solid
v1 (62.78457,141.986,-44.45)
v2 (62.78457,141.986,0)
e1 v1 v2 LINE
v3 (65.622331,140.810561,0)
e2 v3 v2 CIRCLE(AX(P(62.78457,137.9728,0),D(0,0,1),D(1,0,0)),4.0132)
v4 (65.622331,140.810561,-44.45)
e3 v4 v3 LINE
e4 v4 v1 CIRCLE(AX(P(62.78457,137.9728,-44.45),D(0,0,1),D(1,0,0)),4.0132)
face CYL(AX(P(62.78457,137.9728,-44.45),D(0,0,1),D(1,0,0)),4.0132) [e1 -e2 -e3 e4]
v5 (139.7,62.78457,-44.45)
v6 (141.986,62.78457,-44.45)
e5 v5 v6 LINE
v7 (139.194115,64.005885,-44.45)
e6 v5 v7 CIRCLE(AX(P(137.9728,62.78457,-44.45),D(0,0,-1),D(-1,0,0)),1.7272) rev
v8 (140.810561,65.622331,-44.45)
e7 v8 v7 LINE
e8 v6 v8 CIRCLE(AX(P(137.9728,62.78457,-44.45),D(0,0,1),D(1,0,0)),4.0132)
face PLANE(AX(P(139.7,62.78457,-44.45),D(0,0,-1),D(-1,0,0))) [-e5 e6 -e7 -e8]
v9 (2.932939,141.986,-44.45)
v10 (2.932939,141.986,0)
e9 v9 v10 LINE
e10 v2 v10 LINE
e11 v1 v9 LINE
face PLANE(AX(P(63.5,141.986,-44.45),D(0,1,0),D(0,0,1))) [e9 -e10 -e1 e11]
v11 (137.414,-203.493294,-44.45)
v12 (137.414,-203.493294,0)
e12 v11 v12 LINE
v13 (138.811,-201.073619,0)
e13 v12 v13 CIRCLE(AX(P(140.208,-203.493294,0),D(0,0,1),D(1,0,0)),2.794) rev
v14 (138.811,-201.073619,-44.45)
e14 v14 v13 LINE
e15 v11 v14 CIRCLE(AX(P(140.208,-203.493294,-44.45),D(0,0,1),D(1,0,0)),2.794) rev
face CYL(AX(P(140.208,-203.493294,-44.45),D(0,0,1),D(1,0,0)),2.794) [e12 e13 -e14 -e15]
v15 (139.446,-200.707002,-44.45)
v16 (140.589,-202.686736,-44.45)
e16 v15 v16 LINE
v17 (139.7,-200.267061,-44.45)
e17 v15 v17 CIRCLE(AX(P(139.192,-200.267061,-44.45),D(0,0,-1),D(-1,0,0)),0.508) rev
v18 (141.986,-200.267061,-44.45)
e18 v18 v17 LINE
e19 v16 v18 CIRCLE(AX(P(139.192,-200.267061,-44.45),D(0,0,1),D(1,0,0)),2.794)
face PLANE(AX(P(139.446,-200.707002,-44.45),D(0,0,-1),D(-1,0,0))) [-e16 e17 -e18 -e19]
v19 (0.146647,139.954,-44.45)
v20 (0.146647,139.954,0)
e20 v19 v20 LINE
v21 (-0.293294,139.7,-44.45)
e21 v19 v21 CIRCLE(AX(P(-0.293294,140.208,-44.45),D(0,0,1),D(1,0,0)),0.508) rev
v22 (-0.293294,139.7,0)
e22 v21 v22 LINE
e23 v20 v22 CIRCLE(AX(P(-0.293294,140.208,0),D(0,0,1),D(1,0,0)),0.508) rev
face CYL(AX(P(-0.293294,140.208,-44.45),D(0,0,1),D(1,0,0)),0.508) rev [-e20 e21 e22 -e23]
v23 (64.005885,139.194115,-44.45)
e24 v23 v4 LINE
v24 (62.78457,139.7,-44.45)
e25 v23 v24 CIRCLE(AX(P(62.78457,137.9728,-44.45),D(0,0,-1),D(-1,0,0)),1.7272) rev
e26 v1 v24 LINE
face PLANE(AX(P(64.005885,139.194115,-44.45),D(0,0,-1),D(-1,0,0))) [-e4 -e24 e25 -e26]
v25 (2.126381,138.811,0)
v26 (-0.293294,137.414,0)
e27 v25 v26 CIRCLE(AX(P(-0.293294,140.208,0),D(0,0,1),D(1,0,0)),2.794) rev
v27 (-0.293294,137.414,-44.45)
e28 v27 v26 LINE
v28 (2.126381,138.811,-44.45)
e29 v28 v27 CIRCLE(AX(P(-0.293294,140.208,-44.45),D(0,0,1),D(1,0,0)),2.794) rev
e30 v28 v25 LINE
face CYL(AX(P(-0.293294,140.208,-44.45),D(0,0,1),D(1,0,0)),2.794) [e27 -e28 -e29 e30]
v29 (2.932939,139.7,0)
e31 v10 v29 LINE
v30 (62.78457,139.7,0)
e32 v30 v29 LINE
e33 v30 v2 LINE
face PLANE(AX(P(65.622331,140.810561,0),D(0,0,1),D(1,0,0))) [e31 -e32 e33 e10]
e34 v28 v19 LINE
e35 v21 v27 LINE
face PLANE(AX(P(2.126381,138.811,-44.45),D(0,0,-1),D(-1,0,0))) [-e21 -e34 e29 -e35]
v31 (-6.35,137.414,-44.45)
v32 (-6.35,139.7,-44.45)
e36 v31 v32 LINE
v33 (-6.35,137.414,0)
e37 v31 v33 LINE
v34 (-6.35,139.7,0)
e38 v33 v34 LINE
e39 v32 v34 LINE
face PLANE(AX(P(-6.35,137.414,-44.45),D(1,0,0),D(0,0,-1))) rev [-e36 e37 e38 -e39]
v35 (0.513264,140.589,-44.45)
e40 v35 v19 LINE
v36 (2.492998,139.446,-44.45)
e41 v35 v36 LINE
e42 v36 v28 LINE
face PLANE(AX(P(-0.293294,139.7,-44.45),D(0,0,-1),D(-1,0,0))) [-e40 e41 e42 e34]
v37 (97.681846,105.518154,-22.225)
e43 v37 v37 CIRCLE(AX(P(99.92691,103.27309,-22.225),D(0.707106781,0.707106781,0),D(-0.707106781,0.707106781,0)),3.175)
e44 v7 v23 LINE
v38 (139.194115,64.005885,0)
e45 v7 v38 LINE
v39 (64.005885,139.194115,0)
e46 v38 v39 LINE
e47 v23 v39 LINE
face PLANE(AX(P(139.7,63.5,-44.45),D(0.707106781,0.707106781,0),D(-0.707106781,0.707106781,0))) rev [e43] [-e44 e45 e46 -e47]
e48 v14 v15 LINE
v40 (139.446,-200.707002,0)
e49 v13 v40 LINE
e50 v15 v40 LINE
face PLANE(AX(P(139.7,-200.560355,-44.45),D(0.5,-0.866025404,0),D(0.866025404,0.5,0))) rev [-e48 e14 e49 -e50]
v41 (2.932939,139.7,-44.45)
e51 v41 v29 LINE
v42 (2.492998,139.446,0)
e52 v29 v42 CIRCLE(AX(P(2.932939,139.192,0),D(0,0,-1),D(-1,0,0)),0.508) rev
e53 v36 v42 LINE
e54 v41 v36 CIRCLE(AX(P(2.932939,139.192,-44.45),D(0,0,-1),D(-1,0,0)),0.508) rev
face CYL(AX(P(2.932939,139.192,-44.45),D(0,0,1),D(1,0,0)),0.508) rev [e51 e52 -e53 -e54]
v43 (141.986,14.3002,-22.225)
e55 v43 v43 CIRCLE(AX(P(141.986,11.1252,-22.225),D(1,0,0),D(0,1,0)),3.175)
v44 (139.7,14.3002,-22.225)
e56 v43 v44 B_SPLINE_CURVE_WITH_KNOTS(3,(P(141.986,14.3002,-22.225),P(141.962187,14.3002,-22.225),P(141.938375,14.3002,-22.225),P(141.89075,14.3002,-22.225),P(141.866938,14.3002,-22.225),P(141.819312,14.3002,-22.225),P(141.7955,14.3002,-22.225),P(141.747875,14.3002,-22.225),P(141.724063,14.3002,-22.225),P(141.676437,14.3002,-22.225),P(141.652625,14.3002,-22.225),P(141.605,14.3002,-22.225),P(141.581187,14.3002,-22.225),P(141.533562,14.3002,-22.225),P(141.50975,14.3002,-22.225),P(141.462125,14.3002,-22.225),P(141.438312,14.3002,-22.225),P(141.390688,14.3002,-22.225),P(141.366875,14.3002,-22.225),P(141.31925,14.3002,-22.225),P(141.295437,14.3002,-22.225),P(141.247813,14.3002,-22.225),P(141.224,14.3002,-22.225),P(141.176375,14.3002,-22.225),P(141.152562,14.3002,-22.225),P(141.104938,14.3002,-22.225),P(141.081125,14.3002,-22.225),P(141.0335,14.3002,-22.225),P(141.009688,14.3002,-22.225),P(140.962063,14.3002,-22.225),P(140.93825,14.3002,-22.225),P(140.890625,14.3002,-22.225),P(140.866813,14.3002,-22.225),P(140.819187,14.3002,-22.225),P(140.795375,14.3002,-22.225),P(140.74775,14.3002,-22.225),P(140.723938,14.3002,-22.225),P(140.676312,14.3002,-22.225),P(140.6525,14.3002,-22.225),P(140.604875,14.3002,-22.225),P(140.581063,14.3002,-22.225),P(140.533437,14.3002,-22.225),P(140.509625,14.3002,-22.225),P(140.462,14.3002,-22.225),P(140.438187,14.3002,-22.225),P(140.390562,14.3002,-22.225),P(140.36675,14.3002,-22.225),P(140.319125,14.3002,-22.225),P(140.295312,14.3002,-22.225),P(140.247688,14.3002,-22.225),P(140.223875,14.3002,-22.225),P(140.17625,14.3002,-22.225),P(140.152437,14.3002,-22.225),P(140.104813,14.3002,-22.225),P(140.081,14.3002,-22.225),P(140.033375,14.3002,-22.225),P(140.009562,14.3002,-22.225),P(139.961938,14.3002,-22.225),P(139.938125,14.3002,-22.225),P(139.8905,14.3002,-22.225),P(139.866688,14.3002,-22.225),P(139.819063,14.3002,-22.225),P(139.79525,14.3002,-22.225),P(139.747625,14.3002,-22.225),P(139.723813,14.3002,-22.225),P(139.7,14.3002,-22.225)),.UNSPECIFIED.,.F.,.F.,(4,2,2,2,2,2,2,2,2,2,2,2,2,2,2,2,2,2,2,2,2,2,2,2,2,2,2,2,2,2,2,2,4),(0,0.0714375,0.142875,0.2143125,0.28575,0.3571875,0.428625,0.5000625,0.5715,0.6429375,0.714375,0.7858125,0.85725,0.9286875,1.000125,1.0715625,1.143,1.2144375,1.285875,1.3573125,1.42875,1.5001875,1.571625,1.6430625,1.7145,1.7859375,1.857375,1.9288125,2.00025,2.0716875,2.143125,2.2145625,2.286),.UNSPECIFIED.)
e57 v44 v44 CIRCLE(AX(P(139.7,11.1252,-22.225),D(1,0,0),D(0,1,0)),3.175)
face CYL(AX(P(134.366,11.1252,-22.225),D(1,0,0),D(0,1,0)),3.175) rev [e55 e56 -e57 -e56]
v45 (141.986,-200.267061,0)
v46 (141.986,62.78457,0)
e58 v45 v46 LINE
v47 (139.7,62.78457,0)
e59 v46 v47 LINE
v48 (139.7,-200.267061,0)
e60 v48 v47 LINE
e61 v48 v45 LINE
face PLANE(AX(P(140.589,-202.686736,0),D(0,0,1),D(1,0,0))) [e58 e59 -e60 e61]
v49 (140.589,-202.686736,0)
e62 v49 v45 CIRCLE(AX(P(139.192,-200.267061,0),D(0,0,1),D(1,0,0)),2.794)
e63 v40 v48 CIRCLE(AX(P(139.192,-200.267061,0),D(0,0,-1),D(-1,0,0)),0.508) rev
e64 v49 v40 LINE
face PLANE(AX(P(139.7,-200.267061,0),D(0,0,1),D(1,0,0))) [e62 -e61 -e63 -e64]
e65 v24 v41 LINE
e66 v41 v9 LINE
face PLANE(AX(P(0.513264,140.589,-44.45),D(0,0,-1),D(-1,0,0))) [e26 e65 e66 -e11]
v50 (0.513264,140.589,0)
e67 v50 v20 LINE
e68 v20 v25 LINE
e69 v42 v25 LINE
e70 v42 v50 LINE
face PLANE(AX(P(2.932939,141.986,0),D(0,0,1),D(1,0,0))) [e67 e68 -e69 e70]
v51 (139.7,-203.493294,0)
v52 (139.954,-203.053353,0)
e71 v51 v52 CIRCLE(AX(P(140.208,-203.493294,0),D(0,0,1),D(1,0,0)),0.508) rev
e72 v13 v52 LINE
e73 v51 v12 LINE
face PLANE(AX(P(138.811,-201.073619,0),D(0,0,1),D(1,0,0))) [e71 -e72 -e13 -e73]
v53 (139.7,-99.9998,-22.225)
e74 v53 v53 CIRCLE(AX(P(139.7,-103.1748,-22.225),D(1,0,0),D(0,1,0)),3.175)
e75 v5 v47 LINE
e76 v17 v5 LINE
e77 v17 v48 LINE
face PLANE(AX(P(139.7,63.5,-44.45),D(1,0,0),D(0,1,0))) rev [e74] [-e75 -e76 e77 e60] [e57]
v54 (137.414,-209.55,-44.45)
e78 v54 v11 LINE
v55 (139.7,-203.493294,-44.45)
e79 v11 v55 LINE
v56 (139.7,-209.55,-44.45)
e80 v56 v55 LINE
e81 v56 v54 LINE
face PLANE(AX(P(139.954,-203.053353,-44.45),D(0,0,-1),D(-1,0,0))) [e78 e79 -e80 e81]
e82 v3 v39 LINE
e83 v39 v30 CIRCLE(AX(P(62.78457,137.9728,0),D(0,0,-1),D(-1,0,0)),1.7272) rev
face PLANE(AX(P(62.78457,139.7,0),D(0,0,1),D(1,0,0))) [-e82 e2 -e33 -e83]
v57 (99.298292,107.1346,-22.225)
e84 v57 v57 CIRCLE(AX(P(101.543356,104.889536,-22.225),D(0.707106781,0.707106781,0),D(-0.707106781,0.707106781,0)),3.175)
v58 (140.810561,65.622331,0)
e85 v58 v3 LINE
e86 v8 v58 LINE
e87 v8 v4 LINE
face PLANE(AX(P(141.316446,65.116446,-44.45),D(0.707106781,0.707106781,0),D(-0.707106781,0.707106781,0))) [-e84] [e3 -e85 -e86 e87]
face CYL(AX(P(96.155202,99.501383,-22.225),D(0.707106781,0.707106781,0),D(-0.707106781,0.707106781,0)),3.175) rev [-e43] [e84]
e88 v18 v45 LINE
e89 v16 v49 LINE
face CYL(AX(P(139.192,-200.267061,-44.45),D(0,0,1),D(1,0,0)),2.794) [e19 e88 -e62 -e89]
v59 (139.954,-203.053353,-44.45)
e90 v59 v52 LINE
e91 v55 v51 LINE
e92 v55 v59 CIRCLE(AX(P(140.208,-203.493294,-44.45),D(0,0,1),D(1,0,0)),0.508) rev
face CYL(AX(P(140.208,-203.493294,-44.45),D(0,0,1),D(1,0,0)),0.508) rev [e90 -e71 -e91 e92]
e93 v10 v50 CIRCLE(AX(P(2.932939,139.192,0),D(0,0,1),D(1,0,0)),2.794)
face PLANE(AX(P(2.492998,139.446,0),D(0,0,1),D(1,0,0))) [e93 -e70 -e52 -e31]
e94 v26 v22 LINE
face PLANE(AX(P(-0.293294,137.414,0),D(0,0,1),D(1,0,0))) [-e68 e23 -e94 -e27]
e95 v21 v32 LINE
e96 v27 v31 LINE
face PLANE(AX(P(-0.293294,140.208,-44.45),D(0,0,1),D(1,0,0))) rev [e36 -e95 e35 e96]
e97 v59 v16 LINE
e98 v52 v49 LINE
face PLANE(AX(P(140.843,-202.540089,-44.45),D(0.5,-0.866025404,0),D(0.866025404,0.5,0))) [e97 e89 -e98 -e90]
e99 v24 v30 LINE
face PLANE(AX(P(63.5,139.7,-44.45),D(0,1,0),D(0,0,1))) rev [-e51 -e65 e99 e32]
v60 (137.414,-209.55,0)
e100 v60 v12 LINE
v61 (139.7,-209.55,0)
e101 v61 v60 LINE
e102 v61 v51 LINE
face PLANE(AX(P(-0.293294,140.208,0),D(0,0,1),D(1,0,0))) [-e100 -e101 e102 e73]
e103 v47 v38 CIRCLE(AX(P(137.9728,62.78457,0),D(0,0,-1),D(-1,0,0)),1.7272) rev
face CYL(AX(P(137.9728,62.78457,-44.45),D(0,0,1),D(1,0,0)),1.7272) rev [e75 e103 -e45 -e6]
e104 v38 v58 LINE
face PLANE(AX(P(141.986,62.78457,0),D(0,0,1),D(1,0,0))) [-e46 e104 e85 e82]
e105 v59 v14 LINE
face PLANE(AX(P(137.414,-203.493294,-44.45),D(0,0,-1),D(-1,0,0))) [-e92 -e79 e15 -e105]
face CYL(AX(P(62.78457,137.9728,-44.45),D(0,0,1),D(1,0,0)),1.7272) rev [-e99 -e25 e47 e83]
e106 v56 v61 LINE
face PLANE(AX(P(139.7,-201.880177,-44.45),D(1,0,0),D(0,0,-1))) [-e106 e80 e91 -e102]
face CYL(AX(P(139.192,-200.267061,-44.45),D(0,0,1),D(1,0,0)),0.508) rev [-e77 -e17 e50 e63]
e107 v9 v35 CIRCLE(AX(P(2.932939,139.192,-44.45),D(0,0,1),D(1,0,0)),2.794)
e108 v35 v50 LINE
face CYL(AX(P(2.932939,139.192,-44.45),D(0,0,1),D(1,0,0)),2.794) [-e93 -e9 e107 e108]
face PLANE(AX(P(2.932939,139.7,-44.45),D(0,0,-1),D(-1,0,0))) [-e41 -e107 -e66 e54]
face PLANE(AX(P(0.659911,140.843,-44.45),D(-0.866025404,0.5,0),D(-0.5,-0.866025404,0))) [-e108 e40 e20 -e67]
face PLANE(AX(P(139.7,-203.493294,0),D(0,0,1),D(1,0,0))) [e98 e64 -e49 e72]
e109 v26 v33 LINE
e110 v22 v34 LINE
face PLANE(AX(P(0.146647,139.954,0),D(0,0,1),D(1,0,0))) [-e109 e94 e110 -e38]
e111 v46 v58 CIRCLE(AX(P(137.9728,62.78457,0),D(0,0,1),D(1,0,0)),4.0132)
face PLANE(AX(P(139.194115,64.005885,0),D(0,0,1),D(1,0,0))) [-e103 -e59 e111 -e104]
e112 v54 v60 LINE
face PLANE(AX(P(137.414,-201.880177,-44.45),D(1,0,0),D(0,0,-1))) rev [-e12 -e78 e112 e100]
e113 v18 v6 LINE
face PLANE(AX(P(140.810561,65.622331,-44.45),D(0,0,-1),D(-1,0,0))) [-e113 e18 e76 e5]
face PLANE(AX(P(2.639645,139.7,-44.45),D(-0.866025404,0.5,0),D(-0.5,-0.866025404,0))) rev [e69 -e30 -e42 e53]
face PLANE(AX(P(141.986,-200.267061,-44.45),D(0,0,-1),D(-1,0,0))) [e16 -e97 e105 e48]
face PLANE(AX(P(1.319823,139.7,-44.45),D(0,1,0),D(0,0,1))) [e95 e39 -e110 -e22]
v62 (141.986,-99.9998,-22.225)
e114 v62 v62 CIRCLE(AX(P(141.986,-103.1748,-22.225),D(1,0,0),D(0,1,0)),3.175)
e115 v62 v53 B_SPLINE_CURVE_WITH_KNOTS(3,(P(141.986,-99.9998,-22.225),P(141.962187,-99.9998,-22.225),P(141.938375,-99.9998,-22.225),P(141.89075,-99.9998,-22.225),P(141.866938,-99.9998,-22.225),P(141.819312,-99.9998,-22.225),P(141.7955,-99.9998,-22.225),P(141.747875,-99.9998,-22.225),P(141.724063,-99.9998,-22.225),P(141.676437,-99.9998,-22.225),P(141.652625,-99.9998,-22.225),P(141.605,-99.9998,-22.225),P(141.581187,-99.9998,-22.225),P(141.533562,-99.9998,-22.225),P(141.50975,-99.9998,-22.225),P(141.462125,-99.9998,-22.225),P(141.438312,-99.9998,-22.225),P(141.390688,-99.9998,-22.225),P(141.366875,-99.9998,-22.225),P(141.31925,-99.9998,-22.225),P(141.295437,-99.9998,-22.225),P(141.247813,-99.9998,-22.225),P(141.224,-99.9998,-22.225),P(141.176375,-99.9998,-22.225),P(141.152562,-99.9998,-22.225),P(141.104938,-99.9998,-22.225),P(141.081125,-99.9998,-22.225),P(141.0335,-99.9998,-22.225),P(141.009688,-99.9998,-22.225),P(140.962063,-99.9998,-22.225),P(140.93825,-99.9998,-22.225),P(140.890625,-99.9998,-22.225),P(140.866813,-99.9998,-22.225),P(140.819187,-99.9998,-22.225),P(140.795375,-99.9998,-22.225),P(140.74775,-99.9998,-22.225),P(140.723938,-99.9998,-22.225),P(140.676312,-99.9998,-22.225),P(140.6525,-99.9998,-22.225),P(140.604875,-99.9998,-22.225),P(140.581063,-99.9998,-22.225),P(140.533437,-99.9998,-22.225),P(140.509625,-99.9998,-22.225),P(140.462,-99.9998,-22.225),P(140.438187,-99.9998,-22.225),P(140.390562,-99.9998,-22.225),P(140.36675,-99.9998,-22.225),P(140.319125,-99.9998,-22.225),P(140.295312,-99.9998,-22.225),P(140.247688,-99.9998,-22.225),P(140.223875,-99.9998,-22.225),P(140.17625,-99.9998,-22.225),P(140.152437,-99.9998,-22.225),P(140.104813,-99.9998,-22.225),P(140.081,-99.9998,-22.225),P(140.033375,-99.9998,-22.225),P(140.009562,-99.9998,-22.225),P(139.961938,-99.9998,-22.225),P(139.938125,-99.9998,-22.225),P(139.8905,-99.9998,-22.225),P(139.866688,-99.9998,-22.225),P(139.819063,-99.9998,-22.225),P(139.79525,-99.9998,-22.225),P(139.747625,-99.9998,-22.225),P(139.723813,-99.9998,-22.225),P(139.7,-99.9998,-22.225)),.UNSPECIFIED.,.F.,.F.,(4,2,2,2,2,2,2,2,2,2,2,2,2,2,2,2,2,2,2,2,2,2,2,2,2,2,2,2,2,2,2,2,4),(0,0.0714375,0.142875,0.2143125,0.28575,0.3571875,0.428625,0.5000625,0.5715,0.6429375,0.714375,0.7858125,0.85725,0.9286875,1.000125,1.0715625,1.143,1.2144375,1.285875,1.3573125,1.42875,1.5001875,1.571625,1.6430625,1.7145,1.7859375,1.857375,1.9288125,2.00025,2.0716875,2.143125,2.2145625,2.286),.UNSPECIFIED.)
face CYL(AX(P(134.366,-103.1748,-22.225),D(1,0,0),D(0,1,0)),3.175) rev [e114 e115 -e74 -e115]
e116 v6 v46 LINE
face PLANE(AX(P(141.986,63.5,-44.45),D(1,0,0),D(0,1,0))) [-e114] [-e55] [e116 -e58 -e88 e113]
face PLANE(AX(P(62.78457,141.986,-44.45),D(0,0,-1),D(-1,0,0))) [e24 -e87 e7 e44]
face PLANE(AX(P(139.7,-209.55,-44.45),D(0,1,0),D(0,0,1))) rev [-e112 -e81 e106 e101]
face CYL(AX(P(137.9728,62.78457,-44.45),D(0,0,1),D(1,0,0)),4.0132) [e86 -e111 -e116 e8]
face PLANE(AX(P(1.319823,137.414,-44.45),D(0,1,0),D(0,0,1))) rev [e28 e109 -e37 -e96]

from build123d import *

# Parameters (mm, degrees)
BASE_FLANGE1_START                     = -44.45
BASE_FLANGE1_DEPTH                     = 44.45
SKETCH2_R                              = 3.175
CE_00_HOLES_0_250_SIDE_2_PLACES_DEPTH  = 7.62
SKETCH4_R                              = 3.175
CE_00_HOLES_0_250_ANGLED_1_PLACE_DEPTH = 7.62


# Read off the part's stored shape, not the designer's step: Base-Flange1
with BuildPart() as part:
    # Base-Flange1 outline → Base-Flange1 (new body)
    with BuildSketch(Plane.XY.offset(BASE_FLANGE1_START)):
        with BuildLine():
            ThreePointArc((0.146646968, 139.954), (-0.039293937, 139.768059095), (-0.293293937, 139.7))
            Line((-0.293293937, 139.7), (-6.35, 139.7))
            Line((-6.35, 139.7), (-6.35, 137.414))
            Line((-6.35, 137.414), (-0.293293937, 137.414))
            ThreePointArc((-0.293293937, 137.414), (1.103706063, 137.788325022), (2.126381041, 138.811))
            Line((2.126381041, 138.811), (2.492998462, 139.446))
            ThreePointArc((2.492998462, 139.446), (2.678939367, 139.631940905), (2.932939367, 139.7))
            Line((2.932939367, 139.7), (62.784570335, 139.7))
            ThreePointArc((62.784570335, 139.7), (63.44554116, 139.568524729), (64.005885168, 139.194114832))
            Line((64.005885168, 139.194114832), (139.194114832, 64.005885168))
            ThreePointArc((139.194114832, 64.005885168), (139.568524729, 63.44554116), (139.7, 62.784570335))
            Line((139.7, 62.784570335), (139.7, -200.267060633))
            ThreePointArc((139.7, -200.267060633), (139.631940905, -200.521060633), (139.446, -200.707001538))
            Line((139.446, -200.707001538), (138.811, -201.073618959))
            ThreePointArc((138.811, -201.073618959), (137.788325022, -202.096293937), (137.414, -203.493293937))
            Line((137.414, -203.493293937), (137.414, -209.55))
            Line((137.414, -209.55), (139.7, -209.55))
            Line((139.7, -209.55), (139.7, -203.493293937))
            ThreePointArc((139.7, -203.493293937), (139.768059095, -203.239293937), (139.954, -203.053353032))
            Line((139.954, -203.053353032), (140.589, -202.686735611))
            ThreePointArc((140.589, -202.686735611), (141.611674978, -201.664060633), (141.986, -200.267060633))
            Line((141.986, -200.267060633), (141.986, 62.784570335))
            ThreePointArc((141.986, 62.784570335), (141.68051334, 64.320355486), (140.810560934, 65.622331269))
            Line((140.810560934, 65.622331269), (65.622331269, 140.810560934))
            ThreePointArc((65.622331269, 140.810560934), (64.320355486, 141.68051334), (62.784570335, 141.986))
            Line((62.784570335, 141.986), (2.932939367, 141.986))
            ThreePointArc((2.932939367, 141.986), (1.535939367, 141.611674978), (0.513264389, 140.589))
            Line((0.513264389, 140.589), (0.146646968, 139.954))
        make_face()
    extrude(amount=BASE_FLANGE1_DEPTH)

    # Sketch2 → CE-00 Holes 0.250 Side 2 Places (cut)
    with BuildSketch(Plane(origin=(141.986, 0, 0), x_dir=(0, 0, -1), z_dir=(1, 0, 0))):
        with Locations(Location((22.225, 11.1252, 0), (0, 0, 90))):
            Circle(SKETCH2_R)
        with Locations(Location((22.225, -103.1748, 0), (0, 0, 90))):
            Circle(SKETCH2_R)
    extrude(amount=-CE_00_HOLES_0_250_SIDE_2_PLACES_DEPTH, mode=Mode.SUBTRACT)

    # Sketch4 → CE-00 Holes 0.250 Angled 1 Place (cut)
    with BuildSketch(Plane(origin=(103.216446102, 103.216446102, 0), x_dir=(0, 0, -1), z_dir=(0.7071067811865511, 0.7071067811865439, 0))):
        with Locations(Location((22.225, 2.366107061, 0), (0, 0, 90))):
            Circle(SKETCH4_R)
    extrude(amount=-CE_00_HOLES_0_250_ANGLED_1_PLACE_DEPTH, mode=Mode.SUBTRACT)


solid = part.part
